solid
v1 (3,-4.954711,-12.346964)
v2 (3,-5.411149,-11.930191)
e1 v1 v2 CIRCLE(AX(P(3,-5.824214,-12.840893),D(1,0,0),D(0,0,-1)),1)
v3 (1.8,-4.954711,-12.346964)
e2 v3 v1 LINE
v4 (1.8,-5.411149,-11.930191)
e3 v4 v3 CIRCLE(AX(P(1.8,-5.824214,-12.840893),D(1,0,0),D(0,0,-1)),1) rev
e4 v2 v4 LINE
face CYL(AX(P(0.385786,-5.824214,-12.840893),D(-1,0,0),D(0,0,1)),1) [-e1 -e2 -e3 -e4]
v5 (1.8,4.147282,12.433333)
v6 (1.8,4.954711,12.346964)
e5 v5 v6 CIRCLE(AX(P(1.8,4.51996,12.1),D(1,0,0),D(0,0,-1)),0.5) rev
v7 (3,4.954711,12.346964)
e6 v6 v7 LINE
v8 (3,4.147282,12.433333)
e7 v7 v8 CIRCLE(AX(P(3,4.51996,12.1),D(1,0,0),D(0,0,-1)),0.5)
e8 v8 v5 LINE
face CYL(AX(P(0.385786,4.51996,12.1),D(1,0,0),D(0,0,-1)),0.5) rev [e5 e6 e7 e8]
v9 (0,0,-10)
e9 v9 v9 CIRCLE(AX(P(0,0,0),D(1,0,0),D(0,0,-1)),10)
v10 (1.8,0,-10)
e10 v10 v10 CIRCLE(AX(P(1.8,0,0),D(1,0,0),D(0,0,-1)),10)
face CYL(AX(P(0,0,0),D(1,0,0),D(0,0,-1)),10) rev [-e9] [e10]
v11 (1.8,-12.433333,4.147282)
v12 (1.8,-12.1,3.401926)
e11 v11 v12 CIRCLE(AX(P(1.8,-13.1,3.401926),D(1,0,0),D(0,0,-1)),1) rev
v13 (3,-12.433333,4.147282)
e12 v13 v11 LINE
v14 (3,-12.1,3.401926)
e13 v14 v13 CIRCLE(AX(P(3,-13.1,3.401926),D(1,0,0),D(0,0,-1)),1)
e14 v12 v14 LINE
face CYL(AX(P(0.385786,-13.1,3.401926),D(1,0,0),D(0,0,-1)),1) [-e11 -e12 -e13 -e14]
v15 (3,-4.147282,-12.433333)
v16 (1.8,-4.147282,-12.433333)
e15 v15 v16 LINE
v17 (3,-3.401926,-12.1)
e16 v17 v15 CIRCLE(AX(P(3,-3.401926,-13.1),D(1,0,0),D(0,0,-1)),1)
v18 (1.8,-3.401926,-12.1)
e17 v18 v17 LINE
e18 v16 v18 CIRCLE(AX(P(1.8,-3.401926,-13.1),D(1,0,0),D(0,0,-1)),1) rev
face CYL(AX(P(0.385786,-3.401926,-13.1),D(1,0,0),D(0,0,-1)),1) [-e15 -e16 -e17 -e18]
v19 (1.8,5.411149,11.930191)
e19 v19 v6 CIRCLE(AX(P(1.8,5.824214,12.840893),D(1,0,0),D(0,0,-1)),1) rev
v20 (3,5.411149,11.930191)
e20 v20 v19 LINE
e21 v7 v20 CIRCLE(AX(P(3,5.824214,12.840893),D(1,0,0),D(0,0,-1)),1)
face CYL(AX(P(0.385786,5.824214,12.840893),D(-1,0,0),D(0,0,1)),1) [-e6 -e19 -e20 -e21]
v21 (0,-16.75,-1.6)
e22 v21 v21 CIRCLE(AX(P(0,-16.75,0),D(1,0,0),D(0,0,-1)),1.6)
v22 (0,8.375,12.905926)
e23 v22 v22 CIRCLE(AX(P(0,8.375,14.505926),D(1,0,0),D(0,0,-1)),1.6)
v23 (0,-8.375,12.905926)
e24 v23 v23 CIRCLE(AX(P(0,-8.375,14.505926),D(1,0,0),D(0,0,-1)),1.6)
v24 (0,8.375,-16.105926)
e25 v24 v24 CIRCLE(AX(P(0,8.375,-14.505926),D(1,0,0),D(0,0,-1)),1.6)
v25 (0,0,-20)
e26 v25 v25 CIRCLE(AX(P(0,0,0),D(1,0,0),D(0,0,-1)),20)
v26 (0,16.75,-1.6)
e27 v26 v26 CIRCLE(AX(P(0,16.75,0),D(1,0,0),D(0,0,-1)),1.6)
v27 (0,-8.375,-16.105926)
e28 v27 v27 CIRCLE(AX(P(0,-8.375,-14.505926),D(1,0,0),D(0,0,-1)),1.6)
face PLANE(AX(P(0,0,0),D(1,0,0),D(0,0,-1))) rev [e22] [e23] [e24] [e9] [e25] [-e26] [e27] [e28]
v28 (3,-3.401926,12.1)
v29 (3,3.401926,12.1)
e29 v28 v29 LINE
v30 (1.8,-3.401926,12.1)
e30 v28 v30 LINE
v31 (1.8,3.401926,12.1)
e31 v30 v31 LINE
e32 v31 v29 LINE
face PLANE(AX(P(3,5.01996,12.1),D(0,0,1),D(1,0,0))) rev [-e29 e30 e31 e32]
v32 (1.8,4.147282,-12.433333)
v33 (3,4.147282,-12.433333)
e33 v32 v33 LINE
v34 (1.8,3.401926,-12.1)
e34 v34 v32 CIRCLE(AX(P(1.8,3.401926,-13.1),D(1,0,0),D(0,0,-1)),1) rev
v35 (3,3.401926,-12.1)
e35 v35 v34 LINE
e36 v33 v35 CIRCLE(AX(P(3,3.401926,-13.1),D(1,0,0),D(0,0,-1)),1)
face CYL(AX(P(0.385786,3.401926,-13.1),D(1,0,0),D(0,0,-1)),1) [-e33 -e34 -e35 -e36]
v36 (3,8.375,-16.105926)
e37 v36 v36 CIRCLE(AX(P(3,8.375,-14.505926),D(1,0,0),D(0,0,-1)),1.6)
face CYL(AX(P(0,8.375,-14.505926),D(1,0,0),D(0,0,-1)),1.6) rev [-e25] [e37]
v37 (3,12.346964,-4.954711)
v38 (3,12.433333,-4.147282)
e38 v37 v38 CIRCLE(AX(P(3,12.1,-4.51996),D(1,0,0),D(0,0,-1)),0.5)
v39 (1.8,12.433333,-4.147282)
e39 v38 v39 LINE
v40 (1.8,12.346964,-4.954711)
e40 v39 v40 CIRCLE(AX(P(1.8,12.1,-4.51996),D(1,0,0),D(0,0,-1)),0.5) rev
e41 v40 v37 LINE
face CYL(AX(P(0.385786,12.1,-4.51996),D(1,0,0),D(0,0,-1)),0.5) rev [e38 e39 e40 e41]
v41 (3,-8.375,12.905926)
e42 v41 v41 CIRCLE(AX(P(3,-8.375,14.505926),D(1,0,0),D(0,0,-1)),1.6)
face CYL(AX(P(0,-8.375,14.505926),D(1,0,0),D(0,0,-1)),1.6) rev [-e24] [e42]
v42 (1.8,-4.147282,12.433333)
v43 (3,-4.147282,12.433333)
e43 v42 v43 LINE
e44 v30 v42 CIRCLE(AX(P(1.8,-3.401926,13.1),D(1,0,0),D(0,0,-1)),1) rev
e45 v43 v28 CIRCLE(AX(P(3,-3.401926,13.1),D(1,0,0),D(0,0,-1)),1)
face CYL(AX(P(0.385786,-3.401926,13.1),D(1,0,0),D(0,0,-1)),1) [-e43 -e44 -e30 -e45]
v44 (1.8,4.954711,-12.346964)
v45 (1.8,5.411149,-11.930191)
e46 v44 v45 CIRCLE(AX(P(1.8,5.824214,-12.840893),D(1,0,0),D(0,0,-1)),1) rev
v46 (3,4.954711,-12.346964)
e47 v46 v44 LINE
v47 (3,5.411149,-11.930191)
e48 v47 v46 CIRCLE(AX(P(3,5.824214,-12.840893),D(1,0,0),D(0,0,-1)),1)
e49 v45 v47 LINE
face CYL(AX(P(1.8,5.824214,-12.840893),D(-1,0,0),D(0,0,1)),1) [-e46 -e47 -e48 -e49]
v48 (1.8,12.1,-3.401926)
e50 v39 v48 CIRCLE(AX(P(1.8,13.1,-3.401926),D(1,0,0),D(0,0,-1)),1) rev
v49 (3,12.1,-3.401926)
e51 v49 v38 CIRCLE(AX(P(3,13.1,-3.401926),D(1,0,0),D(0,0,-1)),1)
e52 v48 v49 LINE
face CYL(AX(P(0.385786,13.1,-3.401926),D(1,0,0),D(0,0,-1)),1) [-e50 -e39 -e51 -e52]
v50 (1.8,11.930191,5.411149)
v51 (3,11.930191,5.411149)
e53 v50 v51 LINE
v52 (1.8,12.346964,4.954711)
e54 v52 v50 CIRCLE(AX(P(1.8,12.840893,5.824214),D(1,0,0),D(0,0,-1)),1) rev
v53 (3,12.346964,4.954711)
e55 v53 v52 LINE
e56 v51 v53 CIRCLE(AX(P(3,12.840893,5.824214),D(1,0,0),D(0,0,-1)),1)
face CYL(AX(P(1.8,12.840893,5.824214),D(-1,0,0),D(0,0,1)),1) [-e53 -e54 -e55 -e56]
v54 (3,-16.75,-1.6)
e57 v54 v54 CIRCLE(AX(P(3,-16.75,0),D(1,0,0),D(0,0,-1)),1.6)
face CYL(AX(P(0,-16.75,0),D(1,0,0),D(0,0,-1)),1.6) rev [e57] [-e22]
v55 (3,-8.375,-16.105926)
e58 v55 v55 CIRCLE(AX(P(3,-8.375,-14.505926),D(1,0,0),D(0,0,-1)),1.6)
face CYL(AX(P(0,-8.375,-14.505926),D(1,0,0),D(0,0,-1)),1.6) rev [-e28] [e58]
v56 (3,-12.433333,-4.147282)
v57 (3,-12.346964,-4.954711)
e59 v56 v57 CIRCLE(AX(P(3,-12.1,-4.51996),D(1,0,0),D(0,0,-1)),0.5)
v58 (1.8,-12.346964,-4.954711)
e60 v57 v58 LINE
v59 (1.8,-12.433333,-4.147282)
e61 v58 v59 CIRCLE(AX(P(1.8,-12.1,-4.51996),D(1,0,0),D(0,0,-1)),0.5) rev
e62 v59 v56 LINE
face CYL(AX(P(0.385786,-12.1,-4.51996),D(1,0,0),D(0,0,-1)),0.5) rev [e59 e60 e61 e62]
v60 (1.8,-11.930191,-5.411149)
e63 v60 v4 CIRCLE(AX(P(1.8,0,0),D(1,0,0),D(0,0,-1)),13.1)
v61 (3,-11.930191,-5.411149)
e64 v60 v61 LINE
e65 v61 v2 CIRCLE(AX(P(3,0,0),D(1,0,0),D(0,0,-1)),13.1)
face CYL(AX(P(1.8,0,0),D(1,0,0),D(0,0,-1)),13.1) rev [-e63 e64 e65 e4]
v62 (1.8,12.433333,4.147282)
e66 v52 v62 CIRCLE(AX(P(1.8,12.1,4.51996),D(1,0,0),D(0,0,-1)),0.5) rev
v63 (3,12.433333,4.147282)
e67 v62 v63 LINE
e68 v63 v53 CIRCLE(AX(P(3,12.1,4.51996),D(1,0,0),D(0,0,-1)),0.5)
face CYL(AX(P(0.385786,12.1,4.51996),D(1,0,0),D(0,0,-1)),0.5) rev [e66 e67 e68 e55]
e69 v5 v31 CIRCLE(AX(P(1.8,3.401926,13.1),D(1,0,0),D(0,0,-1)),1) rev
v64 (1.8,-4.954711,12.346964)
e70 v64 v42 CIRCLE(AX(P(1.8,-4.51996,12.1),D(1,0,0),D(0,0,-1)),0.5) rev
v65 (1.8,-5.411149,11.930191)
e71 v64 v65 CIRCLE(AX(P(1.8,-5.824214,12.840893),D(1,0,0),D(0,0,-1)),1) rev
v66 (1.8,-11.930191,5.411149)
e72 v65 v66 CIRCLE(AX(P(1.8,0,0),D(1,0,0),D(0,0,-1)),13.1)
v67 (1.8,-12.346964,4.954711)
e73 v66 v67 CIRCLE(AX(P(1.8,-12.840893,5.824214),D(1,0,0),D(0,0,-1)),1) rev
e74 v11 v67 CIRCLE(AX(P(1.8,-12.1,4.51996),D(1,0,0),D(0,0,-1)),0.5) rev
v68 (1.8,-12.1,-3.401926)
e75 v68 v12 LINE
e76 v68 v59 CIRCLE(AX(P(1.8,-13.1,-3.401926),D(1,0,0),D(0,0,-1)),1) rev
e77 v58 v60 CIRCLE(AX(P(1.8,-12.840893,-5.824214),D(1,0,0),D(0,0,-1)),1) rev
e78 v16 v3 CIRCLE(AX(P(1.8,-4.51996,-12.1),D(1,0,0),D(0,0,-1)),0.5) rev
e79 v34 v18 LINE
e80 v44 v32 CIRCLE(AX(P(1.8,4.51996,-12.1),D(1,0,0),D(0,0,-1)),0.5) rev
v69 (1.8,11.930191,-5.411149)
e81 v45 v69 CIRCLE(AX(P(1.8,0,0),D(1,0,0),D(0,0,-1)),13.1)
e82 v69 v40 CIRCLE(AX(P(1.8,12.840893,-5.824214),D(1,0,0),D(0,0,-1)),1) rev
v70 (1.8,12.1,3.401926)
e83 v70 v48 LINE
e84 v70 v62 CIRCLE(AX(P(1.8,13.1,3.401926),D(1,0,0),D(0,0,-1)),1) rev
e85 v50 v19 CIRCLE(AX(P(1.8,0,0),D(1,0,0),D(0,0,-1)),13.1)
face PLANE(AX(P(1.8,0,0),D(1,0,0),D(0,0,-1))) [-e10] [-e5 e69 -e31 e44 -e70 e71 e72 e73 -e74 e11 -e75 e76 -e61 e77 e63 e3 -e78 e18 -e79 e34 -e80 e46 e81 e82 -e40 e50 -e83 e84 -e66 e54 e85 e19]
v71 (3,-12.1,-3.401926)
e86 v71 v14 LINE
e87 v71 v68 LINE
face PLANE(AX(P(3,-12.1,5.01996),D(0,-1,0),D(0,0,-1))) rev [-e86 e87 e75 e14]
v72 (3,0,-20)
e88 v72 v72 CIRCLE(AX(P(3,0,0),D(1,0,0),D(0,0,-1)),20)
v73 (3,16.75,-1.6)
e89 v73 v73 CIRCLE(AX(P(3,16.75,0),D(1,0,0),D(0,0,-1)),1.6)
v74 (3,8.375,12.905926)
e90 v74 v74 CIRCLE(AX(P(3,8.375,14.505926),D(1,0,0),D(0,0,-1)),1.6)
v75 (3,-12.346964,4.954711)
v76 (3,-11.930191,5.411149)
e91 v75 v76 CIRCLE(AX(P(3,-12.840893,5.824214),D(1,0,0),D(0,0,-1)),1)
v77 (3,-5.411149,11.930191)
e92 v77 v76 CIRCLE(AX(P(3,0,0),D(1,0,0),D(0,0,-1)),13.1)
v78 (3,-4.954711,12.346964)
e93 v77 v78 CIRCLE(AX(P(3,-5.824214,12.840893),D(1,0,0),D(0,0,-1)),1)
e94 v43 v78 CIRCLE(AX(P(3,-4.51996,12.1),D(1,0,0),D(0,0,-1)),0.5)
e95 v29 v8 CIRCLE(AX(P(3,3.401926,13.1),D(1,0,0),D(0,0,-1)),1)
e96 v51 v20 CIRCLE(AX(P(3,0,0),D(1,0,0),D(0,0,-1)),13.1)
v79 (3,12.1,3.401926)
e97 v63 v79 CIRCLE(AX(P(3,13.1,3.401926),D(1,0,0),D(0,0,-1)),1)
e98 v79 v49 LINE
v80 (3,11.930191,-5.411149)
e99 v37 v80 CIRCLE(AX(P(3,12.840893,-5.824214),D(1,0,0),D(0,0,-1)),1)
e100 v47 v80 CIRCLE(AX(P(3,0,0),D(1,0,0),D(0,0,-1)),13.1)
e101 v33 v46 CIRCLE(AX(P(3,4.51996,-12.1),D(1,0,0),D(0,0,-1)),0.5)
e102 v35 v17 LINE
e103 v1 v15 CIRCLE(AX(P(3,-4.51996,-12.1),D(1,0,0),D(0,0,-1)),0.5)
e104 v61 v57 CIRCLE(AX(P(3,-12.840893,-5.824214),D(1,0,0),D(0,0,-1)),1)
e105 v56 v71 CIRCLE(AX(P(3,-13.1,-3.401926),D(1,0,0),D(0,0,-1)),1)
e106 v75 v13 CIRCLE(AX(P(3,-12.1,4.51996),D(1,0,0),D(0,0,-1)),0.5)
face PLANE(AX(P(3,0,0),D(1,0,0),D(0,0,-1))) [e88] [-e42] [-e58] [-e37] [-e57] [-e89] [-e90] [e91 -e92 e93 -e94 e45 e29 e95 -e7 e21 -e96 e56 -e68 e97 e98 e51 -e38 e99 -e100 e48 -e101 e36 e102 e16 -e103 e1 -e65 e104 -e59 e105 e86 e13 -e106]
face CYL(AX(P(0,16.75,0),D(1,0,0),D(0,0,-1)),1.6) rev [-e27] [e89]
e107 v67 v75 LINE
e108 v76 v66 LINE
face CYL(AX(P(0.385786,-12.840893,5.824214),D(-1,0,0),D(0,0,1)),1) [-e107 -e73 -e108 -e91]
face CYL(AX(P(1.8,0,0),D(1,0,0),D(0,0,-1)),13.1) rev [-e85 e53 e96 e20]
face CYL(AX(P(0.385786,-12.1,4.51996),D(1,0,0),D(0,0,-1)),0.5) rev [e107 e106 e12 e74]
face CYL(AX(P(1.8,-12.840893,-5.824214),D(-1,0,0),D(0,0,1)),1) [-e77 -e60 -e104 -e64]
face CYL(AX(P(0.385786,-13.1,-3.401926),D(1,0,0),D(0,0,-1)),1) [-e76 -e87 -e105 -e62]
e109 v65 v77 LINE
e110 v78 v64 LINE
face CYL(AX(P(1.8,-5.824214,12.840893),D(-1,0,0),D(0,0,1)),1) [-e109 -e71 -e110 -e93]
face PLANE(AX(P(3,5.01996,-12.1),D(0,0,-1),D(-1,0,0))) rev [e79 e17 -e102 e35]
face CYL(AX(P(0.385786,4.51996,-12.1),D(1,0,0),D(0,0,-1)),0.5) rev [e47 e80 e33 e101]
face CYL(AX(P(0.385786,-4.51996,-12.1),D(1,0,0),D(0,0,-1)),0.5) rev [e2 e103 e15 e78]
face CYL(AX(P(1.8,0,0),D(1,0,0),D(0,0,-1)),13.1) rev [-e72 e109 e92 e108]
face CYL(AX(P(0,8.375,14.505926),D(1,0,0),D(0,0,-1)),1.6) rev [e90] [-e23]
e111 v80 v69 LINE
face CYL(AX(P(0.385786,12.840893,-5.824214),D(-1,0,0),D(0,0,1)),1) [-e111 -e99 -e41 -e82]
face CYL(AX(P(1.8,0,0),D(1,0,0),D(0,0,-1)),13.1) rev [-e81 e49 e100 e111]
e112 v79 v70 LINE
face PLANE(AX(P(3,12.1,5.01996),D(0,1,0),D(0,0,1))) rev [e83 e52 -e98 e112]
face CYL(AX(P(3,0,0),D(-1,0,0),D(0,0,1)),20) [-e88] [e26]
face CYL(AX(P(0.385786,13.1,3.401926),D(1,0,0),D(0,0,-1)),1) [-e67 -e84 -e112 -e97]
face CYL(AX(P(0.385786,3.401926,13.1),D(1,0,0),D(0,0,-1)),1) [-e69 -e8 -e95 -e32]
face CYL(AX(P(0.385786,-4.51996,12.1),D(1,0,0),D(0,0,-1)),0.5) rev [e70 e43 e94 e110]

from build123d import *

# Parameters (mm, degrees)
SKETCH_3_R          = 20
EXTRUDE_3_DEPTH     = 3
SKETCH_4_R          = 13.1
CUT_EXTRUDE_1_DEPTH = 1.2
EXTRUDE_START       = 1.2
EXTRUDE_4_DEPTH     = 1.2
SKETCH_6_R          = 10
CUT_EXTRUDE_2_DEPTH = 29.341489022
SKETCH_7_R          = 1.6
CUT_EXTRUDE_4_DEPTH = 29.442925307
SKETCH_8_R          = 0.5
CUT_EXTRUDE_5_DEPTH = 1.2
FILLET_START        = 1.8
FILLET_1_DEPTH      = 2.2


with BuildPart() as part:
    # 草图3 → 凸台-拉伸3 (new body)
    with BuildSketch(Plane(origin=(0, 0, 0), x_dir=(0, 0, -1), z_dir=(1, 0, 0))):
        Circle(SKETCH_3_R)
    extrude(amount=EXTRUDE_3_DEPTH)

    # 草图4 → 切除-拉伸1 (cut)
    with BuildSketch(Plane(origin=(3, 0, 0), x_dir=(0, 0, -1), z_dir=(1, 0, 0))):
        Circle(SKETCH_4_R)
    extrude(amount=-CUT_EXTRUDE_1_DEPTH, mode=Mode.SUBTRACT)

    # 草图5 → 凸台-拉伸4 (add)
    with BuildSketch(Plane(origin=(1.8, 0, 0), x_dir=(0, 0, -1), z_dir=(1, 0, 0)).offset(EXTRUDE_START)):
        with BuildLine():
            Line((-5.019960159, 12.1), (5.019960159, 12.1))
            ThreePointArc((5.019960159, 12.1), (0, 13.1), (-5.019960159, 12.1))
        make_face()
        with BuildLine():
            Line((-12.1, 5.019960159), (-12.1, -5.019960159))
            ThreePointArc((-12.1, -5.019960159), (-13.1, 0), (-12.1, 5.019960159))
        make_face()
        with BuildLine():
            Line((-5.019960159, -12.1), (5.019960159, -12.1))
            ThreePointArc((5.019960159, -12.1), (0, -13.1), (-5.019960159, -12.1))
        make_face()
        with BuildLine():
            Line((12.1, 5.019960159), (12.1, -5.019960159))
            ThreePointArc((12.1, -5.019960159), (13.1, 0), (12.1, 5.019960159))
        make_face()
    extrude(amount=-EXTRUDE_4_DEPTH)

    # 草图6 → 切除-拉伸2 (cut, through all)
    with BuildSketch(Plane(origin=(1.8, 0, 0), x_dir=(0, 0, -1), z_dir=(1, 0, 0))):
        Circle(SKETCH_6_R)
    extrude(amount=-CUT_EXTRUDE_2_DEPTH, mode=Mode.SUBTRACT)

    # 草图7 → 切除-拉伸4 (cut, through all)
    with BuildSketch(Plane(origin=(3, 0, 0), x_dir=(0, 0, -1), z_dir=(1, 0, 0))):
        with Locations((0, 16.75)):
            Circle(SKETCH_7_R)
        with Locations((14.505925513, 8.375)):
            Circle(SKETCH_7_R)
        with Locations((14.505925513, -8.375)):
            Circle(SKETCH_7_R)
        with Locations((0, -16.75)):
            Circle(SKETCH_7_R)
        with Locations((-14.505925513, -8.375)):
            Circle(SKETCH_7_R)
        with Locations((-14.505925513, 8.375)):
            Circle(SKETCH_7_R)
    extrude(amount=-CUT_EXTRUDE_4_DEPTH, mode=Mode.SUBTRACT)

    # 草图8 → 切除-拉伸5 (cut)
    with BuildSketch(Plane(origin=(3, 0, 0), x_dir=(0, 0, -1), z_dir=(1, 0, 0))):
        with Locations((-4.519960159, 12.1)):
            Circle(SKETCH_8_R)
        with Locations((12.1, 4.519960159)):
            Circle(SKETCH_8_R)
        with Locations((4.519960159, -12.1)):
            Circle(SKETCH_8_R)
        with Locations((-12.1, -4.519960159)):
            Circle(SKETCH_8_R)
        with Locations((4.519960159, 12.1)):
            Circle(SKETCH_8_R)
        with Locations((12.1, -4.519960159)):
            Circle(SKETCH_8_R)
        with Locations((-4.519960159, -12.1)):
            Circle(SKETCH_8_R)
        with Locations((-12.1, 4.519960159)):
            Circle(SKETCH_8_R)
    extrude(amount=-CUT_EXTRUDE_5_DEPTH, mode=Mode.SUBTRACT)

    # 圆角1: read off the stored shape, not the designer's step
    # 圆角1 outline → 圆角1 (cut)
    with BuildSketch(Plane.YZ.offset(FILLET_START)):
        with BuildLine():
            ThreePointArc((3.40192617, -12.1), (3.810174461, -12.187129071), (4.147282163, -12.433333333))
            ThreePointArc((4.147282163, -12.433333333), (4.05287398, -12.278411045), (4.019960159, -12.1))
            Line((4.019960159, -12.1), (3.40192617, -12.1))
        make_face()
        with BuildLine():
            ThreePointArc((5.019960159, -12.1), (5.003372821, -12.227719215), (4.954711368, -12.346964343))
            ThreePointArc((4.954711368, -12.346964343), (5.149921864, -12.102428131), (5.411148977, -11.930191396))
            ThreePointArc((5.411148977, -11.930191396), (5.216245603, -12.016687639), (5.019960159, -12.1))
        make_face()
        with BuildLine():
            ThreePointArc((-4.147282163, -12.433333333), (-3.810174461, -12.187129071), (-3.40192617, -12.1))
            Line((-3.40192617, -12.1), (-4.019960159, -12.1))
            ThreePointArc((-4.019960159, -12.1), (-4.05287398, -12.278411045), (-4.147282163, -12.433333333))
        make_face()
        with BuildLine():
            ThreePointArc((12.1, -5.019960159), (12.016687639, -5.216245603), (11.930191396, -5.411148977))
            ThreePointArc((11.930191396, -5.411148977), (12.102428131, -5.149921864), (12.346964343, -4.954711368))
            ThreePointArc((12.346964343, -4.954711368), (12.227719215, -5.003372821), (12.1, -5.019960159))
        make_face()
        with BuildLine():
            ThreePointArc((-5.411148977, -11.930191396), (-5.149921864, -12.102428131), (-4.954711368, -12.346964343))
            ThreePointArc((-4.954711368, -12.346964343), (-5.003372821, -12.227719215), (-5.019960159, -12.1))
            ThreePointArc((-5.019960159, -12.1), (-5.216245603, -12.016687639), (-5.411148977, -11.930191396))
        make_face()
        with BuildLine():
            ThreePointArc((12.1, -4.019960159), (12.278411045, -4.05287398), (12.433333333, -4.147282163))
            ThreePointArc((12.433333333, -4.147282163), (12.187129071, -3.810174461), (12.1, -3.40192617))
            Line((12.1, -3.40192617), (12.1, -4.019960159))
        make_face()
        with BuildLine():
            ThreePointArc((-12.346964343, -4.954711368), (-12.102428131, -5.149921864), (-11.930191396, -5.411148977))
            ThreePointArc((-11.930191396, -5.411148977), (-12.016687639, -5.216245603), (-12.1, -5.019960159))
            ThreePointArc((-12.1, -5.019960159), (-12.227719215, -5.003372821), (-12.346964343, -4.954711368))
        make_face()
        with BuildLine():
            Line((12.1, 4.019960159), (12.1, 3.40192617))
            ThreePointArc((12.1, 3.40192617), (12.187129071, 3.810174461), (12.433333333, 4.147282163))
            ThreePointArc((12.433333333, 4.147282163), (12.278411045, 4.05287398), (12.1, 4.019960159))
        make_face()
        with BuildLine():
            ThreePointArc((-12.1, -3.40192617), (-12.187129071, -3.810174461), (-12.433333333, -4.147282163))
            ThreePointArc((-12.433333333, -4.147282163), (-12.278411045, -4.05287398), (-12.1, -4.019960159))
            Line((-12.1, -4.019960159), (-12.1, -3.40192617))
        make_face()
        with BuildLine():
            ThreePointArc((12.1, 5.019960159), (12.227719215, 5.003372821), (12.346964343, 4.954711368))
            ThreePointArc((12.346964343, 4.954711368), (12.102428131, 5.149921864), (11.930191396, 5.411148977))
            ThreePointArc((11.930191396, 5.411148977), (12.016687639, 5.216245603), (12.1, 5.019960159))
        make_face()
        with BuildLine():
            ThreePointArc((-12.433333333, 4.147282163), (-12.187129071, 3.810174461), (-12.1, 3.40192617))
            Line((-12.1, 3.40192617), (-12.1, 4.019960159))
            ThreePointArc((-12.1, 4.019960159), (-12.278411045, 4.05287398), (-12.433333333, 4.147282163))
        make_face()
        with BuildLine():
            ThreePointArc((5.019960159, 12.1), (5.216245603, 12.016687639), (5.411148977, 11.930191396))
            ThreePointArc((5.411148977, 11.930191396), (5.149921864, 12.102428131), (4.954711368, 12.346964343))
            ThreePointArc((4.954711368, 12.346964343), (5.003372821, 12.227719215), (5.019960159, 12.1))
        make_face()
        with BuildLine():
            ThreePointArc((-11.930191396, 5.411148977), (-12.102428131, 5.149921864), (-12.346964343, 4.954711368))
            ThreePointArc((-12.346964343, 4.954711368), (-12.227719215, 5.003372821), (-12.1, 5.019960159))
            ThreePointArc((-12.1, 5.019960159), (-12.016687639, 5.216245603), (-11.930191396, 5.411148977))
        make_face()
        with BuildLine():
            ThreePointArc((4.019960159, 12.1), (4.05287398, 12.278411045), (4.147282163, 12.433333333))
            ThreePointArc((4.147282163, 12.433333333), (3.810174461, 12.187129071), (3.40192617, 12.1))
            Line((3.40192617, 12.1), (4.019960159, 12.1))
        make_face()
        with BuildLine():
            ThreePointArc((-4.954711368, 12.346964343), (-5.149921864, 12.102428131), (-5.411148977, 11.930191396))
            ThreePointArc((-5.411148977, 11.930191396), (-5.216245603, 12.016687639), (-5.019960159, 12.1))
            ThreePointArc((-5.019960159, 12.1), (-5.003372821, 12.227719215), (-4.954711368, 12.346964343))
        make_face()
        with BuildLine():
            Line((-4.019960159, 12.1), (-3.40192617, 12.1))
            ThreePointArc((-3.40192617, 12.1), (-3.810174461, 12.187129071), (-4.147282163, 12.433333333))
            ThreePointArc((-4.147282163, 12.433333333), (-4.05287398, 12.278411045), (-4.019960159, 12.1))
        make_face()
    extrude(amount=FILLET_1_DEPTH, mode=Mode.SUBTRACT)


solid = part.part
